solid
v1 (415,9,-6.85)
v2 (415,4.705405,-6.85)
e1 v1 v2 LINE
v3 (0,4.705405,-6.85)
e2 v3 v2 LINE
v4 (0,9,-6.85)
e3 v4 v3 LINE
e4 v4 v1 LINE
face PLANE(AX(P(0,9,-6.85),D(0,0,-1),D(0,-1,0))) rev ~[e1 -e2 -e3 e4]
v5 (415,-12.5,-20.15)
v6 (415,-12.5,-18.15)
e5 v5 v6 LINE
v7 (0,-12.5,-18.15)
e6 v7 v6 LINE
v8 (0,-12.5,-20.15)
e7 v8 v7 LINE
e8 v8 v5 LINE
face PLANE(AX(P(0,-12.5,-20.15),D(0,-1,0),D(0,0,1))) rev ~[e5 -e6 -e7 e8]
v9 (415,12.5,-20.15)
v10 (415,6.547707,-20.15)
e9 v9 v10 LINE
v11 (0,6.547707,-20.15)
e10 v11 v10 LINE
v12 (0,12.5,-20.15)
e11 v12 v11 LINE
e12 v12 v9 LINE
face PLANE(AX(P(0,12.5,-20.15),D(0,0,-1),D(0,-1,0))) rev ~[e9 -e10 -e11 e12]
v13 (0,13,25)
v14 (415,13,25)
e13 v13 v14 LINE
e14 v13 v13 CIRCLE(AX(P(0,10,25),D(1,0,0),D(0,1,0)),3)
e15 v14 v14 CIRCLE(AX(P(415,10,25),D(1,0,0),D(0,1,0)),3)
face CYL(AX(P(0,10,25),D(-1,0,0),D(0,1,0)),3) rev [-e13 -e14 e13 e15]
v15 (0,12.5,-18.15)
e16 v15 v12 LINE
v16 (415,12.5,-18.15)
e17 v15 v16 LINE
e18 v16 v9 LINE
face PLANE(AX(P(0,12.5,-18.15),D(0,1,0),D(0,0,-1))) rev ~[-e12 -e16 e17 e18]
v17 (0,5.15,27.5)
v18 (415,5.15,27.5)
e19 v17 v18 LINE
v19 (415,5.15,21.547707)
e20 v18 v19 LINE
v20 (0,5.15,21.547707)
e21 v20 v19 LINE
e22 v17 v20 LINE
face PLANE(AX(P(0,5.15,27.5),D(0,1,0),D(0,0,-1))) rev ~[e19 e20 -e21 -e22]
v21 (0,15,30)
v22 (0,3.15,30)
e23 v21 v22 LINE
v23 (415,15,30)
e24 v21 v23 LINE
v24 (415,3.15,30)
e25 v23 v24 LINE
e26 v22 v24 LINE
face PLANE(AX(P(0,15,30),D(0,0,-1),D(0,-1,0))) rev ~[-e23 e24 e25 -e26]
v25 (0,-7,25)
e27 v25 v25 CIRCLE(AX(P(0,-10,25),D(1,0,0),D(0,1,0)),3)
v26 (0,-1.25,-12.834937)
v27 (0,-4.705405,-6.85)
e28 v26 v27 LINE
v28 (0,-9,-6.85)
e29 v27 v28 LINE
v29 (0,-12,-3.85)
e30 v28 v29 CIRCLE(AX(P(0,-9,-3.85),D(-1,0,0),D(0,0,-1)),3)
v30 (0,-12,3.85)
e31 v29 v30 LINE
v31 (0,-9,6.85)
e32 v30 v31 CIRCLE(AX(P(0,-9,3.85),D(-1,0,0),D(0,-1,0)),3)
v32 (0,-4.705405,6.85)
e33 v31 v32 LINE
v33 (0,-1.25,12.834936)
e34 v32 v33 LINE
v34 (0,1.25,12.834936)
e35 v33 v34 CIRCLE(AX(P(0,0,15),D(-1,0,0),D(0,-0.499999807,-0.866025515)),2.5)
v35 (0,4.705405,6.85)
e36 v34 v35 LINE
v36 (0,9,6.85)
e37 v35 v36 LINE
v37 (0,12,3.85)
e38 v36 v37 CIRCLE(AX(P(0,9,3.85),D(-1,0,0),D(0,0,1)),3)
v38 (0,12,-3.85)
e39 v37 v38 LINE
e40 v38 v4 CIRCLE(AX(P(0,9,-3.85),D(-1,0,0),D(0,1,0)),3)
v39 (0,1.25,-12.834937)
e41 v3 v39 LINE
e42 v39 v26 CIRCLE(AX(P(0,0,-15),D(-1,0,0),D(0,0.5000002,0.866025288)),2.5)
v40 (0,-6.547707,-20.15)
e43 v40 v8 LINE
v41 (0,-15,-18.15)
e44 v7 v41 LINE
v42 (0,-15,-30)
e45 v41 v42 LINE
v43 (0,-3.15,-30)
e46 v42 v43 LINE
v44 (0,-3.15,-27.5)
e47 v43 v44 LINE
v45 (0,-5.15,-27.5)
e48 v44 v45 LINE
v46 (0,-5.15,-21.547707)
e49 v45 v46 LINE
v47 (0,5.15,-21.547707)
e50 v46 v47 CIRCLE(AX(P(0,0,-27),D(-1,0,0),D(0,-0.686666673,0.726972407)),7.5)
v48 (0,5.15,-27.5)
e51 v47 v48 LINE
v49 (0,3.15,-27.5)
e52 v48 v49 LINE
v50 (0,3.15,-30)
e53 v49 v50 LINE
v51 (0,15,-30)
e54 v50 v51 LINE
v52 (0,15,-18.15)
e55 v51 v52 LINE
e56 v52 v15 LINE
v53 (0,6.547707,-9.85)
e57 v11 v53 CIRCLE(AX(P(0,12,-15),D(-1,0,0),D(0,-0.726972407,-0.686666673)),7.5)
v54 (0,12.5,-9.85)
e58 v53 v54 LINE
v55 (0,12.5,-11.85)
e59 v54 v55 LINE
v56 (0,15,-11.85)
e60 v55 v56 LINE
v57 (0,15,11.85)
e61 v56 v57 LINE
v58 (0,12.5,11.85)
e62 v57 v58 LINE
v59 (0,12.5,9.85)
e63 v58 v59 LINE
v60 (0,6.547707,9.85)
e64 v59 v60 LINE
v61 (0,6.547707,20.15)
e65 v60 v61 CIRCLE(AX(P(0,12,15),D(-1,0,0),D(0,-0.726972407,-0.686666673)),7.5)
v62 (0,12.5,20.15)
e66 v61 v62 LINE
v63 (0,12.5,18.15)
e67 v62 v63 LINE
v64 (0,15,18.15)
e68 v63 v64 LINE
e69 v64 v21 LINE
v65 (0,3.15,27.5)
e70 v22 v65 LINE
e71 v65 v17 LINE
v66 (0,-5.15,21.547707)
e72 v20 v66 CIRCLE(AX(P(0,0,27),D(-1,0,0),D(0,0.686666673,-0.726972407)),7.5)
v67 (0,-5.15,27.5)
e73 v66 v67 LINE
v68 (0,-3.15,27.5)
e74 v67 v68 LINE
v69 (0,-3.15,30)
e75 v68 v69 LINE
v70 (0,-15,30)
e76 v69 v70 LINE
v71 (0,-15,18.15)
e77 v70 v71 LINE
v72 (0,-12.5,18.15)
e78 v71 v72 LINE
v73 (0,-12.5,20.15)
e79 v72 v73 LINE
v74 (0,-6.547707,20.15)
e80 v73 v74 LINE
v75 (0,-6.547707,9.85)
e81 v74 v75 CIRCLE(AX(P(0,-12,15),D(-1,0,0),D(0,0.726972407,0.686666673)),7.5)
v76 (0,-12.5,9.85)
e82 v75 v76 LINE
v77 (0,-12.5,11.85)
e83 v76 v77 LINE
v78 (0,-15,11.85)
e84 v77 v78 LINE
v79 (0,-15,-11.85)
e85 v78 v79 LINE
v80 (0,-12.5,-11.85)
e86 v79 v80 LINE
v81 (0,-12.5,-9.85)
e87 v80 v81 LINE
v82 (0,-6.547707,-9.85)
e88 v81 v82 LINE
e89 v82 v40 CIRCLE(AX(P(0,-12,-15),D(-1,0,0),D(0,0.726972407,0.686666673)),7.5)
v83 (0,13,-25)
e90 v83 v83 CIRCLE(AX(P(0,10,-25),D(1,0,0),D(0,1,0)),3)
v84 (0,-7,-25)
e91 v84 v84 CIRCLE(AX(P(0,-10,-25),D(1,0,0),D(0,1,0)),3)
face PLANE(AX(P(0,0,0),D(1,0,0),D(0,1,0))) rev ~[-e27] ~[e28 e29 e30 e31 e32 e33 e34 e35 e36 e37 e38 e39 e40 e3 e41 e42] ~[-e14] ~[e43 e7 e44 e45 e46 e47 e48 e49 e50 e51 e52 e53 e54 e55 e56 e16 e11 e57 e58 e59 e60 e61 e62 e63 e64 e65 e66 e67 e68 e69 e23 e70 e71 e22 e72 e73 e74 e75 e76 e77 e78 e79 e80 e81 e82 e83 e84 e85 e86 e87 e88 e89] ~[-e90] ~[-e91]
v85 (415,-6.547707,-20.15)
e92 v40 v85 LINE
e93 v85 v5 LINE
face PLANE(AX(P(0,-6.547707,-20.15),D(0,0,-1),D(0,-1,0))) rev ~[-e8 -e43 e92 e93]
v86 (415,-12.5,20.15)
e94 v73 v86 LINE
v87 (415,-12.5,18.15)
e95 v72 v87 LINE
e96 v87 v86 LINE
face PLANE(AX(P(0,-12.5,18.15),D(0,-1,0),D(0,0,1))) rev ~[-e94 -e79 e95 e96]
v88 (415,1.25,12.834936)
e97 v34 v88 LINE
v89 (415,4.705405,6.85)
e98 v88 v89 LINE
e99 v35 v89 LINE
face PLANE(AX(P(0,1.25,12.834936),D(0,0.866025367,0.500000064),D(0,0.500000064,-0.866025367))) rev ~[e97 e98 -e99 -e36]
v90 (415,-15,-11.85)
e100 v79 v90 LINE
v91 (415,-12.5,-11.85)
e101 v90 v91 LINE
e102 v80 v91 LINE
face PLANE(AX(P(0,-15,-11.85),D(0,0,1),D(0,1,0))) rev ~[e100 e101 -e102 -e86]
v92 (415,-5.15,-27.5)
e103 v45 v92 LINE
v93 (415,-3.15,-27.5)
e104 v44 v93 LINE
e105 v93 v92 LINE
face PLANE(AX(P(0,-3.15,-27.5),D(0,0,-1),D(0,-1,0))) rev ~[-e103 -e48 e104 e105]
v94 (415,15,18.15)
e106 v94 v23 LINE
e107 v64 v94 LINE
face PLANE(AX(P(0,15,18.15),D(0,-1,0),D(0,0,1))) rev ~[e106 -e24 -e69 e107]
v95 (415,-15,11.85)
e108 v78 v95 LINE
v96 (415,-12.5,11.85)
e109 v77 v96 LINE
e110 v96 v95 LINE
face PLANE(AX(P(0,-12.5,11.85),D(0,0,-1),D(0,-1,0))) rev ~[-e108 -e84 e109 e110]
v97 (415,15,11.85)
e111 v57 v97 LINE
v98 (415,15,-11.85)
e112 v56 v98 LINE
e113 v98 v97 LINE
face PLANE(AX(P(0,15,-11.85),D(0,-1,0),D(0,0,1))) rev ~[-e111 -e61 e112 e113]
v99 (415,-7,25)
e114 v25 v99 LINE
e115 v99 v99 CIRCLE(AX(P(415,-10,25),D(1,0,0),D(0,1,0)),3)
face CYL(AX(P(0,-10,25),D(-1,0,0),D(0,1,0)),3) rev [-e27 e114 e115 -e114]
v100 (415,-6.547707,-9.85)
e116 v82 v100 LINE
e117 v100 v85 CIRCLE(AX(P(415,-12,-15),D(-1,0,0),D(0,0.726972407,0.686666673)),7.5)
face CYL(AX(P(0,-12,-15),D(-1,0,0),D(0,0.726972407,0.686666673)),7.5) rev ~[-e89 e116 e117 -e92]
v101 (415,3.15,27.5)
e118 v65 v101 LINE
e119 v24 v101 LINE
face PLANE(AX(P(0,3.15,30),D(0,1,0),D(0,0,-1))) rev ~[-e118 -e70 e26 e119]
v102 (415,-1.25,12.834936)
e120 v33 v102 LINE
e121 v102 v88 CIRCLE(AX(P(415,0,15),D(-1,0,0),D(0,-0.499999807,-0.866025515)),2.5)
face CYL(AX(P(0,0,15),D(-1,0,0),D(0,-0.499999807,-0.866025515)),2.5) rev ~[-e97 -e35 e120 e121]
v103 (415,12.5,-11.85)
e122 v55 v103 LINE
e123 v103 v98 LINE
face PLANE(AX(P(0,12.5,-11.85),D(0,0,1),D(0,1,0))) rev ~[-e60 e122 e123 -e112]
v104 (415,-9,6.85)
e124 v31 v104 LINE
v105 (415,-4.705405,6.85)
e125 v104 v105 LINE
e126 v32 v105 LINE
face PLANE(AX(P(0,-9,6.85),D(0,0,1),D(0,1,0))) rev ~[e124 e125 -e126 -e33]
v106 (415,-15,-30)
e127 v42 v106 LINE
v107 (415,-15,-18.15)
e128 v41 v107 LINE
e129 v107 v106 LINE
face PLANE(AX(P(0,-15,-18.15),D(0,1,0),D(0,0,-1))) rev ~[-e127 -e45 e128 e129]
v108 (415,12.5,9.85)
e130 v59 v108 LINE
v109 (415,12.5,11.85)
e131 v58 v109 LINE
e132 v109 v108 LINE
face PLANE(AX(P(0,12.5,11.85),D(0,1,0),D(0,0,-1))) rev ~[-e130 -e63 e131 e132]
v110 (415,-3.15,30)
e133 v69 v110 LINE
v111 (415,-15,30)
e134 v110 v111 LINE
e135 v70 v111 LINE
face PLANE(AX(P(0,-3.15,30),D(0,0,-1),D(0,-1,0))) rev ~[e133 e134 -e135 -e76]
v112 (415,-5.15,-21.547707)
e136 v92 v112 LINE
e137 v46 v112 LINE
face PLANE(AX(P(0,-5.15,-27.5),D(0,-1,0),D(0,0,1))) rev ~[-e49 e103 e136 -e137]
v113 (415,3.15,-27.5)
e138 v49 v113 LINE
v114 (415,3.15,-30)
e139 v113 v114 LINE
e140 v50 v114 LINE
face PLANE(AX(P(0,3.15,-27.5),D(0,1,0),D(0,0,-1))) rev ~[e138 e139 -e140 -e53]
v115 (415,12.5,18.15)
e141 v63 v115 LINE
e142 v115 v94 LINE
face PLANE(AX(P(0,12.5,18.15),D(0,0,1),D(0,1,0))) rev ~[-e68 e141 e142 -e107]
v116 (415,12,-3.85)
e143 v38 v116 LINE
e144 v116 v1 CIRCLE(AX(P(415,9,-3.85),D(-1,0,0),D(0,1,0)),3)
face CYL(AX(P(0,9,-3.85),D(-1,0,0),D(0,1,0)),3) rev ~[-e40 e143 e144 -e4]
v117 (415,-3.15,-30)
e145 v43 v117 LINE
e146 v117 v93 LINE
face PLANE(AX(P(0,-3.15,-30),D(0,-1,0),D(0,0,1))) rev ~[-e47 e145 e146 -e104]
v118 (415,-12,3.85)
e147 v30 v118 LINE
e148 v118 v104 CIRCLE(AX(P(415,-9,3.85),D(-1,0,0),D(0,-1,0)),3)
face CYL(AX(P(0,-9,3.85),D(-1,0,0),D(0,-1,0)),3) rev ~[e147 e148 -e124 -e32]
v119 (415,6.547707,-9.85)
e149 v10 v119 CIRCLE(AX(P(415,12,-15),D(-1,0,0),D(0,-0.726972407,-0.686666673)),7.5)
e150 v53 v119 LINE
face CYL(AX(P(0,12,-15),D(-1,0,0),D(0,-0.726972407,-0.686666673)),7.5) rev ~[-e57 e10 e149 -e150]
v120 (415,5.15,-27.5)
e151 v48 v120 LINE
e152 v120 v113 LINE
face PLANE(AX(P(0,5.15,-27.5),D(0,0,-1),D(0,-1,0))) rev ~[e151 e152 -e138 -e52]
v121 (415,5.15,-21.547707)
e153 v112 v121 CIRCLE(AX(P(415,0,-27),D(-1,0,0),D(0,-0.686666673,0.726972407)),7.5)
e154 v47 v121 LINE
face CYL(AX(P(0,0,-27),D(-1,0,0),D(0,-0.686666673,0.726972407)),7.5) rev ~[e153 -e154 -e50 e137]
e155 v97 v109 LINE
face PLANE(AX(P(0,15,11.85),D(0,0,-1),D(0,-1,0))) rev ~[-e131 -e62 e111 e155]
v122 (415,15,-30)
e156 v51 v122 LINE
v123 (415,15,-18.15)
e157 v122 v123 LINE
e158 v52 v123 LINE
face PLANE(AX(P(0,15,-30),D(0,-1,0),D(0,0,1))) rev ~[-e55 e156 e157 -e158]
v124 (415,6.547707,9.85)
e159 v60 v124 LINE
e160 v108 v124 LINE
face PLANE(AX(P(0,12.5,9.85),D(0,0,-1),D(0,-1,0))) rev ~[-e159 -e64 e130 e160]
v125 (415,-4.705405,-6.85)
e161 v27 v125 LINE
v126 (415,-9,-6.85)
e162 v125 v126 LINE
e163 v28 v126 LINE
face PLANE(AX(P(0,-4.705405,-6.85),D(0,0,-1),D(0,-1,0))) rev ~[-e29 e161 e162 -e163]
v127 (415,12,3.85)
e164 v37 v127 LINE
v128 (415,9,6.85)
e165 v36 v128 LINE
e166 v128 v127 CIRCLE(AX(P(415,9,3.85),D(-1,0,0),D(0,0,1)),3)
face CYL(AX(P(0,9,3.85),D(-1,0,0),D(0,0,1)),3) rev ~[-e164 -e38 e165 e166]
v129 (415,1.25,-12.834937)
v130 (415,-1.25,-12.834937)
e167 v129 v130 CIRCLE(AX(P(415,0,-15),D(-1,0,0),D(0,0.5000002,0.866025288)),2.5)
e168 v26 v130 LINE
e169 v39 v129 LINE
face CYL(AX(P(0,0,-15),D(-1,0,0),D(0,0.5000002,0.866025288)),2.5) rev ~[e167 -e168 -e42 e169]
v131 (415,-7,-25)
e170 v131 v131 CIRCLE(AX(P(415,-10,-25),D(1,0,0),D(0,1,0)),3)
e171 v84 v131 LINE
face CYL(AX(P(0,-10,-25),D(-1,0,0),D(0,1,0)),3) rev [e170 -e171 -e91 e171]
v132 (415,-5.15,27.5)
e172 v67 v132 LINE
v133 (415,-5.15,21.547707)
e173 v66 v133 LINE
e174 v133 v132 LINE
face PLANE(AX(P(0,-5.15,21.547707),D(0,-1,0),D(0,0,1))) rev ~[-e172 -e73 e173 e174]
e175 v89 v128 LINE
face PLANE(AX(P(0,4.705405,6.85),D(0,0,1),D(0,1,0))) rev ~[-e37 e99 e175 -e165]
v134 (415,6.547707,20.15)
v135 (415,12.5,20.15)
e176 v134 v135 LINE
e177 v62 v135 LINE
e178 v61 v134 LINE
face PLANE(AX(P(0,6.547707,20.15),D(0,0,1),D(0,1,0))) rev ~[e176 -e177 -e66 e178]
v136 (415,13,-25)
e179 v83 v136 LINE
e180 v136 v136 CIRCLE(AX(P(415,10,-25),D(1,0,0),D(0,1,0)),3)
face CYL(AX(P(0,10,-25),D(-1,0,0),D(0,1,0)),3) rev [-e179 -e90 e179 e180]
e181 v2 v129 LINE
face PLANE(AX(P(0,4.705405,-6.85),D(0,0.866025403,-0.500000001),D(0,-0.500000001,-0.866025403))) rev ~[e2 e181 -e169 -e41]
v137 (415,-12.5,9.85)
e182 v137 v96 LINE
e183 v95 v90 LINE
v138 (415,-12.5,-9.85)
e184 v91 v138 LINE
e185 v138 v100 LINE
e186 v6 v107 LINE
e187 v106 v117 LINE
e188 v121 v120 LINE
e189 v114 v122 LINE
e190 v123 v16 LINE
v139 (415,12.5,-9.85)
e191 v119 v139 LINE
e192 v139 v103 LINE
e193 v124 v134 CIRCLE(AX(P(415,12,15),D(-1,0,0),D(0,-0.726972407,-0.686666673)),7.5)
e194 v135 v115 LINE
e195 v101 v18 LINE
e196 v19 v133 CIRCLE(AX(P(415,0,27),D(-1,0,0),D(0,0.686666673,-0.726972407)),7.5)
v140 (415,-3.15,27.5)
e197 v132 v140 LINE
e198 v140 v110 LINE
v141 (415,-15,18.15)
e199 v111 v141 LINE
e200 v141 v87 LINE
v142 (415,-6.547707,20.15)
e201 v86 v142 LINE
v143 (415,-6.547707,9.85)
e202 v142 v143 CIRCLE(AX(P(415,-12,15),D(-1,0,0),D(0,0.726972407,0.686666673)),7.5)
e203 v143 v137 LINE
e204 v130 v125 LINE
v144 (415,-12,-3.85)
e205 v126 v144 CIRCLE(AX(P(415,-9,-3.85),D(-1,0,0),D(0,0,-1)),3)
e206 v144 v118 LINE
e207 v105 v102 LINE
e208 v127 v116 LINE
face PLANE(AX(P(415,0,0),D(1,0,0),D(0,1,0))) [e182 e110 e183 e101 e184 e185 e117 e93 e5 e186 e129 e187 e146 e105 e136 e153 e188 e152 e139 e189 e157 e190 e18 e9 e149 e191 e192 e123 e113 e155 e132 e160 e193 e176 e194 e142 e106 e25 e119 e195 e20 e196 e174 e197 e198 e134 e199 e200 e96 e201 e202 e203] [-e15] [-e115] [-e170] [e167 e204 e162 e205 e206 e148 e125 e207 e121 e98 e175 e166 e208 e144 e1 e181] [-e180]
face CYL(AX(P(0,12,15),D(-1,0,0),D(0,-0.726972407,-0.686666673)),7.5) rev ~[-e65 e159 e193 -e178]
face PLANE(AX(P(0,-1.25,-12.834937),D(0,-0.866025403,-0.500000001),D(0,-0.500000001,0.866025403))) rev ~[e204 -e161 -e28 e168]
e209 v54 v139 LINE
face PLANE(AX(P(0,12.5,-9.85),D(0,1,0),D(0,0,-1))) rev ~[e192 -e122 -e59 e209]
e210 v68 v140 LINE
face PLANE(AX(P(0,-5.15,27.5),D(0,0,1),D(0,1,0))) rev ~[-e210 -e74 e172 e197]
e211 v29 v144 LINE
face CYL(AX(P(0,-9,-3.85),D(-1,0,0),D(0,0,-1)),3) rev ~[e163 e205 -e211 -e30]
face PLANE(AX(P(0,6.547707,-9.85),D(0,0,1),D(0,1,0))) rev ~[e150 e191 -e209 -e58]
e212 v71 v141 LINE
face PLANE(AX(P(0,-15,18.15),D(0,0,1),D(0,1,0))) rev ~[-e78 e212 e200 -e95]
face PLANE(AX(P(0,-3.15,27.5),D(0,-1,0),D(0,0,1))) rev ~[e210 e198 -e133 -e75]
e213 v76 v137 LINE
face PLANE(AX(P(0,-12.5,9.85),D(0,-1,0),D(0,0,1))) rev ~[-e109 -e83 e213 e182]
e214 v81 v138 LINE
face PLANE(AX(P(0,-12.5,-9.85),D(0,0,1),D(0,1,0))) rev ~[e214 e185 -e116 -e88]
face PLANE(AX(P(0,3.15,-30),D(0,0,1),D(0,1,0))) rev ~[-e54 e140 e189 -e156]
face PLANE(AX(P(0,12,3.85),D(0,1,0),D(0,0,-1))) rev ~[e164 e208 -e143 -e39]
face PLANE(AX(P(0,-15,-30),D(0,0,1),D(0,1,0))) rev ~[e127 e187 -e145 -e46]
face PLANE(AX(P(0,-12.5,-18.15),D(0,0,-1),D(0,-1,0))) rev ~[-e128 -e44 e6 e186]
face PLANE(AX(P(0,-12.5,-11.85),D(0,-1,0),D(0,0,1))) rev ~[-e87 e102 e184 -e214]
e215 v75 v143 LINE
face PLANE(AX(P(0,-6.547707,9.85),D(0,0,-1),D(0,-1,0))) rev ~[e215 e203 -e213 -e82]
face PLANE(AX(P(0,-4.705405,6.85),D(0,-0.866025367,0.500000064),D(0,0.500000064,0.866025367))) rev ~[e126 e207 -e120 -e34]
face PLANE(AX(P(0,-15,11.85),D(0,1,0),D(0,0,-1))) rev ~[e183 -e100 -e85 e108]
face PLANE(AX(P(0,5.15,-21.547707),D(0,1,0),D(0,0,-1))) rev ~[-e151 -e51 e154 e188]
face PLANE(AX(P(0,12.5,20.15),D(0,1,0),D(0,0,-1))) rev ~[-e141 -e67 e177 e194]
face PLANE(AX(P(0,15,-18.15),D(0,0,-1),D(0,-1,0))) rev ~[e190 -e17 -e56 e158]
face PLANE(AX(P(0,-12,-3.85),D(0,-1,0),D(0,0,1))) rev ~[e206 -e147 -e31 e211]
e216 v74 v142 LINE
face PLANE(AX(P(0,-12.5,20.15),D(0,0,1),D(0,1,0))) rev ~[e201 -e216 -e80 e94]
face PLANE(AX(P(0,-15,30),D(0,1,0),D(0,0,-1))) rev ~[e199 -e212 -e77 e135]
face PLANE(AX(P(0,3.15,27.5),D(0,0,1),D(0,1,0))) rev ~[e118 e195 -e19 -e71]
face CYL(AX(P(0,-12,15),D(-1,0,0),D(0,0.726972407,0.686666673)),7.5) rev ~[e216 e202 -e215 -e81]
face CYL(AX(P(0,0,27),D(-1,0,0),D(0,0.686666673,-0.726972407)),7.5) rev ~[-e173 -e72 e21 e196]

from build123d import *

# Parameters (mm, degrees)
F0_R     = 3
F1_DEPTH = 415


# Not quite as in the source:
# - ends of sketch curves that miss each other by under 0.0002 mm in the source are joined


with BuildPart() as f1:
    # F0 (on Right) → F1 (new body)
    with BuildSketch(Plane.YZ):
        with BuildLine():
            Line((12.5, -11.85), (15, -11.85))
            Line((15, -11.85), (15, 11.85))
            Line((15, 11.85), (12.5, 11.85))
            Line((12.5, 11.85), (12.5, 9.85))
            Line((12.5, 9.85), (6.547707, 9.85))
            ThreePointArc((6.5477069495, 9.8499999523), (4.5, 15), (6.5477069495, 20.1500000477))
            Line((6.547707, 20.15), (12.5, 20.15))
            Line((12.5, 20.15), (12.5, 18.15))
            Line((12.5, 18.15), (15, 18.15))
            Line((15, 18.15), (15, 30))
            Line((15, 30), (3.15, 30))
            Line((3.15, 30), (3.15, 27.5))
            Line((3.15, 27.5), (5.15, 27.5))
            Line((5.15, 27.5), (5.15, 21.547707))
            ThreePointArc((5.1500000477, 21.5477069495), (0, 19.5), (-5.1500000477, 21.5477069495))
            Line((-5.15, 21.547707), (-5.15, 27.5))
            Line((-5.15, 27.5), (-3.15, 27.5))
            Line((-3.15, 27.5), (-3.15, 30))
            Line((-3.15, 30), (-15, 30))
            Line((-15, 30), (-15, 18.15))
            Line((-15, 18.15), (-12.5, 18.15))
            Line((-12.5, 18.15), (-12.5, 20.15))
            Line((-12.5, 20.15), (-6.547707, 20.15))
            ThreePointArc((-6.5477069495, 20.1500000477), (-4.5, 15), (-6.5477069495, 9.8499999523))
            Line((-6.547707, 9.85), (-12.5, 9.85))
            Line((-12.5, 9.85), (-12.5, 11.85))
            Line((-12.5, 11.85), (-15, 11.85))
            Line((-15, 11.85), (-15, -11.85))
            Line((-15, -11.85), (-12.5, -11.85))
            Line((-12.5, -11.85), (-12.5, -9.85))
            Line((-12.5, -9.85), (-6.547707, -9.85))
            ThreePointArc((-6.5477069495, -9.8499999523), (-4.5, -15), (-6.5477069495, -20.1500000477))
            Line((-6.547707, -20.15), (-12.5, -20.15))
            Line((-12.5, -20.15), (-12.5, -18.15))
            Line((-12.5, -18.15), (-15, -18.15))
            Line((-15, -18.15), (-15, -30))
            Line((-15, -30), (-3.15, -30))
            Line((-3.15, -30), (-3.15, -27.5))
            Line((-3.15, -27.5), (-5.15, -27.5))
            Line((-5.15, -27.5), (-5.15, -21.547707))
            ThreePointArc((-5.1500000477, -21.5477069495), (0, -19.5), (5.1500000477, -21.5477069495))
            Line((5.15, -21.547707), (5.15, -27.5))
            Line((5.15, -27.5), (3.15, -27.5))
            Line((3.15, -27.5), (3.15, -30))
            Line((3.15, -30), (15, -30))
            Line((15, -30), (15, -18.15))
            Line((15, -18.15), (12.5, -18.15))
            Line((12.5, -18.15), (12.5, -20.15))
            Line((12.5, -20.15), (6.547707, -20.15))
            ThreePointArc((6.5477069495, -20.1500000477), (4.5, -15), (6.5477069495, -9.8499999523))
            Line((6.547707, -9.85), (12.5, -9.85))
            Line((12.5, -9.85), (12.5, -11.85))
        make_face()
        with Locations((-10, -25)):
            Circle(F0_R, mode=Mode.SUBTRACT)
        with Locations((10, -25)):
            Circle(F0_R, mode=Mode.SUBTRACT)
        with Locations((-10, 25)):
            Circle(F0_R, mode=Mode.SUBTRACT)
        with BuildLine():
            ThreePointArc((-12, 3.85), (-11.1213203436, 5.9713203436), (-9, 6.85))
            Line((-9, 6.85), (-4.705405, 6.85))
            Line((-4.705405, 6.85), (-1.25, 12.834936))
            ThreePointArc((-1.25, 12.834936), (0, 17.5), (1.2499997876, 12.8349363679))
            Line((1.2499997876, 12.8349363679), (4.705405, 6.85))
            Line((4.705405, 6.85), (9, 6.85))
            ThreePointArc((9, 6.85), (11.1213203436, 5.9713203436), (12, 3.85))
            Line((12, 3.85), (12, -3.85))
            ThreePointArc((12, -3.85), (11.1213203436, -5.9713203436), (9, -6.85))
            Line((9, -6.85), (4.705405, -6.85))
            Line((4.705405, -6.85), (1.25, -12.834937))
            ThreePointArc((1.25, -12.834937), (0, -17.5), (-1.2500002206, -12.8349366179))
            Line((-1.2500002206, -12.8349366179), (-4.705405, -6.85))
            Line((-4.705405, -6.85), (-9, -6.85))
            ThreePointArc((-9, -6.85), (-11.1213203436, -5.9713203436), (-12, -3.85))
            Line((-12, -3.85), (-12, 3.85))
        make_face(mode=Mode.SUBTRACT)
        with Locations((10, 25)):
            Circle(F0_R, mode=Mode.SUBTRACT)
    extrude(amount=F1_DEPTH)


solid = f1.part
